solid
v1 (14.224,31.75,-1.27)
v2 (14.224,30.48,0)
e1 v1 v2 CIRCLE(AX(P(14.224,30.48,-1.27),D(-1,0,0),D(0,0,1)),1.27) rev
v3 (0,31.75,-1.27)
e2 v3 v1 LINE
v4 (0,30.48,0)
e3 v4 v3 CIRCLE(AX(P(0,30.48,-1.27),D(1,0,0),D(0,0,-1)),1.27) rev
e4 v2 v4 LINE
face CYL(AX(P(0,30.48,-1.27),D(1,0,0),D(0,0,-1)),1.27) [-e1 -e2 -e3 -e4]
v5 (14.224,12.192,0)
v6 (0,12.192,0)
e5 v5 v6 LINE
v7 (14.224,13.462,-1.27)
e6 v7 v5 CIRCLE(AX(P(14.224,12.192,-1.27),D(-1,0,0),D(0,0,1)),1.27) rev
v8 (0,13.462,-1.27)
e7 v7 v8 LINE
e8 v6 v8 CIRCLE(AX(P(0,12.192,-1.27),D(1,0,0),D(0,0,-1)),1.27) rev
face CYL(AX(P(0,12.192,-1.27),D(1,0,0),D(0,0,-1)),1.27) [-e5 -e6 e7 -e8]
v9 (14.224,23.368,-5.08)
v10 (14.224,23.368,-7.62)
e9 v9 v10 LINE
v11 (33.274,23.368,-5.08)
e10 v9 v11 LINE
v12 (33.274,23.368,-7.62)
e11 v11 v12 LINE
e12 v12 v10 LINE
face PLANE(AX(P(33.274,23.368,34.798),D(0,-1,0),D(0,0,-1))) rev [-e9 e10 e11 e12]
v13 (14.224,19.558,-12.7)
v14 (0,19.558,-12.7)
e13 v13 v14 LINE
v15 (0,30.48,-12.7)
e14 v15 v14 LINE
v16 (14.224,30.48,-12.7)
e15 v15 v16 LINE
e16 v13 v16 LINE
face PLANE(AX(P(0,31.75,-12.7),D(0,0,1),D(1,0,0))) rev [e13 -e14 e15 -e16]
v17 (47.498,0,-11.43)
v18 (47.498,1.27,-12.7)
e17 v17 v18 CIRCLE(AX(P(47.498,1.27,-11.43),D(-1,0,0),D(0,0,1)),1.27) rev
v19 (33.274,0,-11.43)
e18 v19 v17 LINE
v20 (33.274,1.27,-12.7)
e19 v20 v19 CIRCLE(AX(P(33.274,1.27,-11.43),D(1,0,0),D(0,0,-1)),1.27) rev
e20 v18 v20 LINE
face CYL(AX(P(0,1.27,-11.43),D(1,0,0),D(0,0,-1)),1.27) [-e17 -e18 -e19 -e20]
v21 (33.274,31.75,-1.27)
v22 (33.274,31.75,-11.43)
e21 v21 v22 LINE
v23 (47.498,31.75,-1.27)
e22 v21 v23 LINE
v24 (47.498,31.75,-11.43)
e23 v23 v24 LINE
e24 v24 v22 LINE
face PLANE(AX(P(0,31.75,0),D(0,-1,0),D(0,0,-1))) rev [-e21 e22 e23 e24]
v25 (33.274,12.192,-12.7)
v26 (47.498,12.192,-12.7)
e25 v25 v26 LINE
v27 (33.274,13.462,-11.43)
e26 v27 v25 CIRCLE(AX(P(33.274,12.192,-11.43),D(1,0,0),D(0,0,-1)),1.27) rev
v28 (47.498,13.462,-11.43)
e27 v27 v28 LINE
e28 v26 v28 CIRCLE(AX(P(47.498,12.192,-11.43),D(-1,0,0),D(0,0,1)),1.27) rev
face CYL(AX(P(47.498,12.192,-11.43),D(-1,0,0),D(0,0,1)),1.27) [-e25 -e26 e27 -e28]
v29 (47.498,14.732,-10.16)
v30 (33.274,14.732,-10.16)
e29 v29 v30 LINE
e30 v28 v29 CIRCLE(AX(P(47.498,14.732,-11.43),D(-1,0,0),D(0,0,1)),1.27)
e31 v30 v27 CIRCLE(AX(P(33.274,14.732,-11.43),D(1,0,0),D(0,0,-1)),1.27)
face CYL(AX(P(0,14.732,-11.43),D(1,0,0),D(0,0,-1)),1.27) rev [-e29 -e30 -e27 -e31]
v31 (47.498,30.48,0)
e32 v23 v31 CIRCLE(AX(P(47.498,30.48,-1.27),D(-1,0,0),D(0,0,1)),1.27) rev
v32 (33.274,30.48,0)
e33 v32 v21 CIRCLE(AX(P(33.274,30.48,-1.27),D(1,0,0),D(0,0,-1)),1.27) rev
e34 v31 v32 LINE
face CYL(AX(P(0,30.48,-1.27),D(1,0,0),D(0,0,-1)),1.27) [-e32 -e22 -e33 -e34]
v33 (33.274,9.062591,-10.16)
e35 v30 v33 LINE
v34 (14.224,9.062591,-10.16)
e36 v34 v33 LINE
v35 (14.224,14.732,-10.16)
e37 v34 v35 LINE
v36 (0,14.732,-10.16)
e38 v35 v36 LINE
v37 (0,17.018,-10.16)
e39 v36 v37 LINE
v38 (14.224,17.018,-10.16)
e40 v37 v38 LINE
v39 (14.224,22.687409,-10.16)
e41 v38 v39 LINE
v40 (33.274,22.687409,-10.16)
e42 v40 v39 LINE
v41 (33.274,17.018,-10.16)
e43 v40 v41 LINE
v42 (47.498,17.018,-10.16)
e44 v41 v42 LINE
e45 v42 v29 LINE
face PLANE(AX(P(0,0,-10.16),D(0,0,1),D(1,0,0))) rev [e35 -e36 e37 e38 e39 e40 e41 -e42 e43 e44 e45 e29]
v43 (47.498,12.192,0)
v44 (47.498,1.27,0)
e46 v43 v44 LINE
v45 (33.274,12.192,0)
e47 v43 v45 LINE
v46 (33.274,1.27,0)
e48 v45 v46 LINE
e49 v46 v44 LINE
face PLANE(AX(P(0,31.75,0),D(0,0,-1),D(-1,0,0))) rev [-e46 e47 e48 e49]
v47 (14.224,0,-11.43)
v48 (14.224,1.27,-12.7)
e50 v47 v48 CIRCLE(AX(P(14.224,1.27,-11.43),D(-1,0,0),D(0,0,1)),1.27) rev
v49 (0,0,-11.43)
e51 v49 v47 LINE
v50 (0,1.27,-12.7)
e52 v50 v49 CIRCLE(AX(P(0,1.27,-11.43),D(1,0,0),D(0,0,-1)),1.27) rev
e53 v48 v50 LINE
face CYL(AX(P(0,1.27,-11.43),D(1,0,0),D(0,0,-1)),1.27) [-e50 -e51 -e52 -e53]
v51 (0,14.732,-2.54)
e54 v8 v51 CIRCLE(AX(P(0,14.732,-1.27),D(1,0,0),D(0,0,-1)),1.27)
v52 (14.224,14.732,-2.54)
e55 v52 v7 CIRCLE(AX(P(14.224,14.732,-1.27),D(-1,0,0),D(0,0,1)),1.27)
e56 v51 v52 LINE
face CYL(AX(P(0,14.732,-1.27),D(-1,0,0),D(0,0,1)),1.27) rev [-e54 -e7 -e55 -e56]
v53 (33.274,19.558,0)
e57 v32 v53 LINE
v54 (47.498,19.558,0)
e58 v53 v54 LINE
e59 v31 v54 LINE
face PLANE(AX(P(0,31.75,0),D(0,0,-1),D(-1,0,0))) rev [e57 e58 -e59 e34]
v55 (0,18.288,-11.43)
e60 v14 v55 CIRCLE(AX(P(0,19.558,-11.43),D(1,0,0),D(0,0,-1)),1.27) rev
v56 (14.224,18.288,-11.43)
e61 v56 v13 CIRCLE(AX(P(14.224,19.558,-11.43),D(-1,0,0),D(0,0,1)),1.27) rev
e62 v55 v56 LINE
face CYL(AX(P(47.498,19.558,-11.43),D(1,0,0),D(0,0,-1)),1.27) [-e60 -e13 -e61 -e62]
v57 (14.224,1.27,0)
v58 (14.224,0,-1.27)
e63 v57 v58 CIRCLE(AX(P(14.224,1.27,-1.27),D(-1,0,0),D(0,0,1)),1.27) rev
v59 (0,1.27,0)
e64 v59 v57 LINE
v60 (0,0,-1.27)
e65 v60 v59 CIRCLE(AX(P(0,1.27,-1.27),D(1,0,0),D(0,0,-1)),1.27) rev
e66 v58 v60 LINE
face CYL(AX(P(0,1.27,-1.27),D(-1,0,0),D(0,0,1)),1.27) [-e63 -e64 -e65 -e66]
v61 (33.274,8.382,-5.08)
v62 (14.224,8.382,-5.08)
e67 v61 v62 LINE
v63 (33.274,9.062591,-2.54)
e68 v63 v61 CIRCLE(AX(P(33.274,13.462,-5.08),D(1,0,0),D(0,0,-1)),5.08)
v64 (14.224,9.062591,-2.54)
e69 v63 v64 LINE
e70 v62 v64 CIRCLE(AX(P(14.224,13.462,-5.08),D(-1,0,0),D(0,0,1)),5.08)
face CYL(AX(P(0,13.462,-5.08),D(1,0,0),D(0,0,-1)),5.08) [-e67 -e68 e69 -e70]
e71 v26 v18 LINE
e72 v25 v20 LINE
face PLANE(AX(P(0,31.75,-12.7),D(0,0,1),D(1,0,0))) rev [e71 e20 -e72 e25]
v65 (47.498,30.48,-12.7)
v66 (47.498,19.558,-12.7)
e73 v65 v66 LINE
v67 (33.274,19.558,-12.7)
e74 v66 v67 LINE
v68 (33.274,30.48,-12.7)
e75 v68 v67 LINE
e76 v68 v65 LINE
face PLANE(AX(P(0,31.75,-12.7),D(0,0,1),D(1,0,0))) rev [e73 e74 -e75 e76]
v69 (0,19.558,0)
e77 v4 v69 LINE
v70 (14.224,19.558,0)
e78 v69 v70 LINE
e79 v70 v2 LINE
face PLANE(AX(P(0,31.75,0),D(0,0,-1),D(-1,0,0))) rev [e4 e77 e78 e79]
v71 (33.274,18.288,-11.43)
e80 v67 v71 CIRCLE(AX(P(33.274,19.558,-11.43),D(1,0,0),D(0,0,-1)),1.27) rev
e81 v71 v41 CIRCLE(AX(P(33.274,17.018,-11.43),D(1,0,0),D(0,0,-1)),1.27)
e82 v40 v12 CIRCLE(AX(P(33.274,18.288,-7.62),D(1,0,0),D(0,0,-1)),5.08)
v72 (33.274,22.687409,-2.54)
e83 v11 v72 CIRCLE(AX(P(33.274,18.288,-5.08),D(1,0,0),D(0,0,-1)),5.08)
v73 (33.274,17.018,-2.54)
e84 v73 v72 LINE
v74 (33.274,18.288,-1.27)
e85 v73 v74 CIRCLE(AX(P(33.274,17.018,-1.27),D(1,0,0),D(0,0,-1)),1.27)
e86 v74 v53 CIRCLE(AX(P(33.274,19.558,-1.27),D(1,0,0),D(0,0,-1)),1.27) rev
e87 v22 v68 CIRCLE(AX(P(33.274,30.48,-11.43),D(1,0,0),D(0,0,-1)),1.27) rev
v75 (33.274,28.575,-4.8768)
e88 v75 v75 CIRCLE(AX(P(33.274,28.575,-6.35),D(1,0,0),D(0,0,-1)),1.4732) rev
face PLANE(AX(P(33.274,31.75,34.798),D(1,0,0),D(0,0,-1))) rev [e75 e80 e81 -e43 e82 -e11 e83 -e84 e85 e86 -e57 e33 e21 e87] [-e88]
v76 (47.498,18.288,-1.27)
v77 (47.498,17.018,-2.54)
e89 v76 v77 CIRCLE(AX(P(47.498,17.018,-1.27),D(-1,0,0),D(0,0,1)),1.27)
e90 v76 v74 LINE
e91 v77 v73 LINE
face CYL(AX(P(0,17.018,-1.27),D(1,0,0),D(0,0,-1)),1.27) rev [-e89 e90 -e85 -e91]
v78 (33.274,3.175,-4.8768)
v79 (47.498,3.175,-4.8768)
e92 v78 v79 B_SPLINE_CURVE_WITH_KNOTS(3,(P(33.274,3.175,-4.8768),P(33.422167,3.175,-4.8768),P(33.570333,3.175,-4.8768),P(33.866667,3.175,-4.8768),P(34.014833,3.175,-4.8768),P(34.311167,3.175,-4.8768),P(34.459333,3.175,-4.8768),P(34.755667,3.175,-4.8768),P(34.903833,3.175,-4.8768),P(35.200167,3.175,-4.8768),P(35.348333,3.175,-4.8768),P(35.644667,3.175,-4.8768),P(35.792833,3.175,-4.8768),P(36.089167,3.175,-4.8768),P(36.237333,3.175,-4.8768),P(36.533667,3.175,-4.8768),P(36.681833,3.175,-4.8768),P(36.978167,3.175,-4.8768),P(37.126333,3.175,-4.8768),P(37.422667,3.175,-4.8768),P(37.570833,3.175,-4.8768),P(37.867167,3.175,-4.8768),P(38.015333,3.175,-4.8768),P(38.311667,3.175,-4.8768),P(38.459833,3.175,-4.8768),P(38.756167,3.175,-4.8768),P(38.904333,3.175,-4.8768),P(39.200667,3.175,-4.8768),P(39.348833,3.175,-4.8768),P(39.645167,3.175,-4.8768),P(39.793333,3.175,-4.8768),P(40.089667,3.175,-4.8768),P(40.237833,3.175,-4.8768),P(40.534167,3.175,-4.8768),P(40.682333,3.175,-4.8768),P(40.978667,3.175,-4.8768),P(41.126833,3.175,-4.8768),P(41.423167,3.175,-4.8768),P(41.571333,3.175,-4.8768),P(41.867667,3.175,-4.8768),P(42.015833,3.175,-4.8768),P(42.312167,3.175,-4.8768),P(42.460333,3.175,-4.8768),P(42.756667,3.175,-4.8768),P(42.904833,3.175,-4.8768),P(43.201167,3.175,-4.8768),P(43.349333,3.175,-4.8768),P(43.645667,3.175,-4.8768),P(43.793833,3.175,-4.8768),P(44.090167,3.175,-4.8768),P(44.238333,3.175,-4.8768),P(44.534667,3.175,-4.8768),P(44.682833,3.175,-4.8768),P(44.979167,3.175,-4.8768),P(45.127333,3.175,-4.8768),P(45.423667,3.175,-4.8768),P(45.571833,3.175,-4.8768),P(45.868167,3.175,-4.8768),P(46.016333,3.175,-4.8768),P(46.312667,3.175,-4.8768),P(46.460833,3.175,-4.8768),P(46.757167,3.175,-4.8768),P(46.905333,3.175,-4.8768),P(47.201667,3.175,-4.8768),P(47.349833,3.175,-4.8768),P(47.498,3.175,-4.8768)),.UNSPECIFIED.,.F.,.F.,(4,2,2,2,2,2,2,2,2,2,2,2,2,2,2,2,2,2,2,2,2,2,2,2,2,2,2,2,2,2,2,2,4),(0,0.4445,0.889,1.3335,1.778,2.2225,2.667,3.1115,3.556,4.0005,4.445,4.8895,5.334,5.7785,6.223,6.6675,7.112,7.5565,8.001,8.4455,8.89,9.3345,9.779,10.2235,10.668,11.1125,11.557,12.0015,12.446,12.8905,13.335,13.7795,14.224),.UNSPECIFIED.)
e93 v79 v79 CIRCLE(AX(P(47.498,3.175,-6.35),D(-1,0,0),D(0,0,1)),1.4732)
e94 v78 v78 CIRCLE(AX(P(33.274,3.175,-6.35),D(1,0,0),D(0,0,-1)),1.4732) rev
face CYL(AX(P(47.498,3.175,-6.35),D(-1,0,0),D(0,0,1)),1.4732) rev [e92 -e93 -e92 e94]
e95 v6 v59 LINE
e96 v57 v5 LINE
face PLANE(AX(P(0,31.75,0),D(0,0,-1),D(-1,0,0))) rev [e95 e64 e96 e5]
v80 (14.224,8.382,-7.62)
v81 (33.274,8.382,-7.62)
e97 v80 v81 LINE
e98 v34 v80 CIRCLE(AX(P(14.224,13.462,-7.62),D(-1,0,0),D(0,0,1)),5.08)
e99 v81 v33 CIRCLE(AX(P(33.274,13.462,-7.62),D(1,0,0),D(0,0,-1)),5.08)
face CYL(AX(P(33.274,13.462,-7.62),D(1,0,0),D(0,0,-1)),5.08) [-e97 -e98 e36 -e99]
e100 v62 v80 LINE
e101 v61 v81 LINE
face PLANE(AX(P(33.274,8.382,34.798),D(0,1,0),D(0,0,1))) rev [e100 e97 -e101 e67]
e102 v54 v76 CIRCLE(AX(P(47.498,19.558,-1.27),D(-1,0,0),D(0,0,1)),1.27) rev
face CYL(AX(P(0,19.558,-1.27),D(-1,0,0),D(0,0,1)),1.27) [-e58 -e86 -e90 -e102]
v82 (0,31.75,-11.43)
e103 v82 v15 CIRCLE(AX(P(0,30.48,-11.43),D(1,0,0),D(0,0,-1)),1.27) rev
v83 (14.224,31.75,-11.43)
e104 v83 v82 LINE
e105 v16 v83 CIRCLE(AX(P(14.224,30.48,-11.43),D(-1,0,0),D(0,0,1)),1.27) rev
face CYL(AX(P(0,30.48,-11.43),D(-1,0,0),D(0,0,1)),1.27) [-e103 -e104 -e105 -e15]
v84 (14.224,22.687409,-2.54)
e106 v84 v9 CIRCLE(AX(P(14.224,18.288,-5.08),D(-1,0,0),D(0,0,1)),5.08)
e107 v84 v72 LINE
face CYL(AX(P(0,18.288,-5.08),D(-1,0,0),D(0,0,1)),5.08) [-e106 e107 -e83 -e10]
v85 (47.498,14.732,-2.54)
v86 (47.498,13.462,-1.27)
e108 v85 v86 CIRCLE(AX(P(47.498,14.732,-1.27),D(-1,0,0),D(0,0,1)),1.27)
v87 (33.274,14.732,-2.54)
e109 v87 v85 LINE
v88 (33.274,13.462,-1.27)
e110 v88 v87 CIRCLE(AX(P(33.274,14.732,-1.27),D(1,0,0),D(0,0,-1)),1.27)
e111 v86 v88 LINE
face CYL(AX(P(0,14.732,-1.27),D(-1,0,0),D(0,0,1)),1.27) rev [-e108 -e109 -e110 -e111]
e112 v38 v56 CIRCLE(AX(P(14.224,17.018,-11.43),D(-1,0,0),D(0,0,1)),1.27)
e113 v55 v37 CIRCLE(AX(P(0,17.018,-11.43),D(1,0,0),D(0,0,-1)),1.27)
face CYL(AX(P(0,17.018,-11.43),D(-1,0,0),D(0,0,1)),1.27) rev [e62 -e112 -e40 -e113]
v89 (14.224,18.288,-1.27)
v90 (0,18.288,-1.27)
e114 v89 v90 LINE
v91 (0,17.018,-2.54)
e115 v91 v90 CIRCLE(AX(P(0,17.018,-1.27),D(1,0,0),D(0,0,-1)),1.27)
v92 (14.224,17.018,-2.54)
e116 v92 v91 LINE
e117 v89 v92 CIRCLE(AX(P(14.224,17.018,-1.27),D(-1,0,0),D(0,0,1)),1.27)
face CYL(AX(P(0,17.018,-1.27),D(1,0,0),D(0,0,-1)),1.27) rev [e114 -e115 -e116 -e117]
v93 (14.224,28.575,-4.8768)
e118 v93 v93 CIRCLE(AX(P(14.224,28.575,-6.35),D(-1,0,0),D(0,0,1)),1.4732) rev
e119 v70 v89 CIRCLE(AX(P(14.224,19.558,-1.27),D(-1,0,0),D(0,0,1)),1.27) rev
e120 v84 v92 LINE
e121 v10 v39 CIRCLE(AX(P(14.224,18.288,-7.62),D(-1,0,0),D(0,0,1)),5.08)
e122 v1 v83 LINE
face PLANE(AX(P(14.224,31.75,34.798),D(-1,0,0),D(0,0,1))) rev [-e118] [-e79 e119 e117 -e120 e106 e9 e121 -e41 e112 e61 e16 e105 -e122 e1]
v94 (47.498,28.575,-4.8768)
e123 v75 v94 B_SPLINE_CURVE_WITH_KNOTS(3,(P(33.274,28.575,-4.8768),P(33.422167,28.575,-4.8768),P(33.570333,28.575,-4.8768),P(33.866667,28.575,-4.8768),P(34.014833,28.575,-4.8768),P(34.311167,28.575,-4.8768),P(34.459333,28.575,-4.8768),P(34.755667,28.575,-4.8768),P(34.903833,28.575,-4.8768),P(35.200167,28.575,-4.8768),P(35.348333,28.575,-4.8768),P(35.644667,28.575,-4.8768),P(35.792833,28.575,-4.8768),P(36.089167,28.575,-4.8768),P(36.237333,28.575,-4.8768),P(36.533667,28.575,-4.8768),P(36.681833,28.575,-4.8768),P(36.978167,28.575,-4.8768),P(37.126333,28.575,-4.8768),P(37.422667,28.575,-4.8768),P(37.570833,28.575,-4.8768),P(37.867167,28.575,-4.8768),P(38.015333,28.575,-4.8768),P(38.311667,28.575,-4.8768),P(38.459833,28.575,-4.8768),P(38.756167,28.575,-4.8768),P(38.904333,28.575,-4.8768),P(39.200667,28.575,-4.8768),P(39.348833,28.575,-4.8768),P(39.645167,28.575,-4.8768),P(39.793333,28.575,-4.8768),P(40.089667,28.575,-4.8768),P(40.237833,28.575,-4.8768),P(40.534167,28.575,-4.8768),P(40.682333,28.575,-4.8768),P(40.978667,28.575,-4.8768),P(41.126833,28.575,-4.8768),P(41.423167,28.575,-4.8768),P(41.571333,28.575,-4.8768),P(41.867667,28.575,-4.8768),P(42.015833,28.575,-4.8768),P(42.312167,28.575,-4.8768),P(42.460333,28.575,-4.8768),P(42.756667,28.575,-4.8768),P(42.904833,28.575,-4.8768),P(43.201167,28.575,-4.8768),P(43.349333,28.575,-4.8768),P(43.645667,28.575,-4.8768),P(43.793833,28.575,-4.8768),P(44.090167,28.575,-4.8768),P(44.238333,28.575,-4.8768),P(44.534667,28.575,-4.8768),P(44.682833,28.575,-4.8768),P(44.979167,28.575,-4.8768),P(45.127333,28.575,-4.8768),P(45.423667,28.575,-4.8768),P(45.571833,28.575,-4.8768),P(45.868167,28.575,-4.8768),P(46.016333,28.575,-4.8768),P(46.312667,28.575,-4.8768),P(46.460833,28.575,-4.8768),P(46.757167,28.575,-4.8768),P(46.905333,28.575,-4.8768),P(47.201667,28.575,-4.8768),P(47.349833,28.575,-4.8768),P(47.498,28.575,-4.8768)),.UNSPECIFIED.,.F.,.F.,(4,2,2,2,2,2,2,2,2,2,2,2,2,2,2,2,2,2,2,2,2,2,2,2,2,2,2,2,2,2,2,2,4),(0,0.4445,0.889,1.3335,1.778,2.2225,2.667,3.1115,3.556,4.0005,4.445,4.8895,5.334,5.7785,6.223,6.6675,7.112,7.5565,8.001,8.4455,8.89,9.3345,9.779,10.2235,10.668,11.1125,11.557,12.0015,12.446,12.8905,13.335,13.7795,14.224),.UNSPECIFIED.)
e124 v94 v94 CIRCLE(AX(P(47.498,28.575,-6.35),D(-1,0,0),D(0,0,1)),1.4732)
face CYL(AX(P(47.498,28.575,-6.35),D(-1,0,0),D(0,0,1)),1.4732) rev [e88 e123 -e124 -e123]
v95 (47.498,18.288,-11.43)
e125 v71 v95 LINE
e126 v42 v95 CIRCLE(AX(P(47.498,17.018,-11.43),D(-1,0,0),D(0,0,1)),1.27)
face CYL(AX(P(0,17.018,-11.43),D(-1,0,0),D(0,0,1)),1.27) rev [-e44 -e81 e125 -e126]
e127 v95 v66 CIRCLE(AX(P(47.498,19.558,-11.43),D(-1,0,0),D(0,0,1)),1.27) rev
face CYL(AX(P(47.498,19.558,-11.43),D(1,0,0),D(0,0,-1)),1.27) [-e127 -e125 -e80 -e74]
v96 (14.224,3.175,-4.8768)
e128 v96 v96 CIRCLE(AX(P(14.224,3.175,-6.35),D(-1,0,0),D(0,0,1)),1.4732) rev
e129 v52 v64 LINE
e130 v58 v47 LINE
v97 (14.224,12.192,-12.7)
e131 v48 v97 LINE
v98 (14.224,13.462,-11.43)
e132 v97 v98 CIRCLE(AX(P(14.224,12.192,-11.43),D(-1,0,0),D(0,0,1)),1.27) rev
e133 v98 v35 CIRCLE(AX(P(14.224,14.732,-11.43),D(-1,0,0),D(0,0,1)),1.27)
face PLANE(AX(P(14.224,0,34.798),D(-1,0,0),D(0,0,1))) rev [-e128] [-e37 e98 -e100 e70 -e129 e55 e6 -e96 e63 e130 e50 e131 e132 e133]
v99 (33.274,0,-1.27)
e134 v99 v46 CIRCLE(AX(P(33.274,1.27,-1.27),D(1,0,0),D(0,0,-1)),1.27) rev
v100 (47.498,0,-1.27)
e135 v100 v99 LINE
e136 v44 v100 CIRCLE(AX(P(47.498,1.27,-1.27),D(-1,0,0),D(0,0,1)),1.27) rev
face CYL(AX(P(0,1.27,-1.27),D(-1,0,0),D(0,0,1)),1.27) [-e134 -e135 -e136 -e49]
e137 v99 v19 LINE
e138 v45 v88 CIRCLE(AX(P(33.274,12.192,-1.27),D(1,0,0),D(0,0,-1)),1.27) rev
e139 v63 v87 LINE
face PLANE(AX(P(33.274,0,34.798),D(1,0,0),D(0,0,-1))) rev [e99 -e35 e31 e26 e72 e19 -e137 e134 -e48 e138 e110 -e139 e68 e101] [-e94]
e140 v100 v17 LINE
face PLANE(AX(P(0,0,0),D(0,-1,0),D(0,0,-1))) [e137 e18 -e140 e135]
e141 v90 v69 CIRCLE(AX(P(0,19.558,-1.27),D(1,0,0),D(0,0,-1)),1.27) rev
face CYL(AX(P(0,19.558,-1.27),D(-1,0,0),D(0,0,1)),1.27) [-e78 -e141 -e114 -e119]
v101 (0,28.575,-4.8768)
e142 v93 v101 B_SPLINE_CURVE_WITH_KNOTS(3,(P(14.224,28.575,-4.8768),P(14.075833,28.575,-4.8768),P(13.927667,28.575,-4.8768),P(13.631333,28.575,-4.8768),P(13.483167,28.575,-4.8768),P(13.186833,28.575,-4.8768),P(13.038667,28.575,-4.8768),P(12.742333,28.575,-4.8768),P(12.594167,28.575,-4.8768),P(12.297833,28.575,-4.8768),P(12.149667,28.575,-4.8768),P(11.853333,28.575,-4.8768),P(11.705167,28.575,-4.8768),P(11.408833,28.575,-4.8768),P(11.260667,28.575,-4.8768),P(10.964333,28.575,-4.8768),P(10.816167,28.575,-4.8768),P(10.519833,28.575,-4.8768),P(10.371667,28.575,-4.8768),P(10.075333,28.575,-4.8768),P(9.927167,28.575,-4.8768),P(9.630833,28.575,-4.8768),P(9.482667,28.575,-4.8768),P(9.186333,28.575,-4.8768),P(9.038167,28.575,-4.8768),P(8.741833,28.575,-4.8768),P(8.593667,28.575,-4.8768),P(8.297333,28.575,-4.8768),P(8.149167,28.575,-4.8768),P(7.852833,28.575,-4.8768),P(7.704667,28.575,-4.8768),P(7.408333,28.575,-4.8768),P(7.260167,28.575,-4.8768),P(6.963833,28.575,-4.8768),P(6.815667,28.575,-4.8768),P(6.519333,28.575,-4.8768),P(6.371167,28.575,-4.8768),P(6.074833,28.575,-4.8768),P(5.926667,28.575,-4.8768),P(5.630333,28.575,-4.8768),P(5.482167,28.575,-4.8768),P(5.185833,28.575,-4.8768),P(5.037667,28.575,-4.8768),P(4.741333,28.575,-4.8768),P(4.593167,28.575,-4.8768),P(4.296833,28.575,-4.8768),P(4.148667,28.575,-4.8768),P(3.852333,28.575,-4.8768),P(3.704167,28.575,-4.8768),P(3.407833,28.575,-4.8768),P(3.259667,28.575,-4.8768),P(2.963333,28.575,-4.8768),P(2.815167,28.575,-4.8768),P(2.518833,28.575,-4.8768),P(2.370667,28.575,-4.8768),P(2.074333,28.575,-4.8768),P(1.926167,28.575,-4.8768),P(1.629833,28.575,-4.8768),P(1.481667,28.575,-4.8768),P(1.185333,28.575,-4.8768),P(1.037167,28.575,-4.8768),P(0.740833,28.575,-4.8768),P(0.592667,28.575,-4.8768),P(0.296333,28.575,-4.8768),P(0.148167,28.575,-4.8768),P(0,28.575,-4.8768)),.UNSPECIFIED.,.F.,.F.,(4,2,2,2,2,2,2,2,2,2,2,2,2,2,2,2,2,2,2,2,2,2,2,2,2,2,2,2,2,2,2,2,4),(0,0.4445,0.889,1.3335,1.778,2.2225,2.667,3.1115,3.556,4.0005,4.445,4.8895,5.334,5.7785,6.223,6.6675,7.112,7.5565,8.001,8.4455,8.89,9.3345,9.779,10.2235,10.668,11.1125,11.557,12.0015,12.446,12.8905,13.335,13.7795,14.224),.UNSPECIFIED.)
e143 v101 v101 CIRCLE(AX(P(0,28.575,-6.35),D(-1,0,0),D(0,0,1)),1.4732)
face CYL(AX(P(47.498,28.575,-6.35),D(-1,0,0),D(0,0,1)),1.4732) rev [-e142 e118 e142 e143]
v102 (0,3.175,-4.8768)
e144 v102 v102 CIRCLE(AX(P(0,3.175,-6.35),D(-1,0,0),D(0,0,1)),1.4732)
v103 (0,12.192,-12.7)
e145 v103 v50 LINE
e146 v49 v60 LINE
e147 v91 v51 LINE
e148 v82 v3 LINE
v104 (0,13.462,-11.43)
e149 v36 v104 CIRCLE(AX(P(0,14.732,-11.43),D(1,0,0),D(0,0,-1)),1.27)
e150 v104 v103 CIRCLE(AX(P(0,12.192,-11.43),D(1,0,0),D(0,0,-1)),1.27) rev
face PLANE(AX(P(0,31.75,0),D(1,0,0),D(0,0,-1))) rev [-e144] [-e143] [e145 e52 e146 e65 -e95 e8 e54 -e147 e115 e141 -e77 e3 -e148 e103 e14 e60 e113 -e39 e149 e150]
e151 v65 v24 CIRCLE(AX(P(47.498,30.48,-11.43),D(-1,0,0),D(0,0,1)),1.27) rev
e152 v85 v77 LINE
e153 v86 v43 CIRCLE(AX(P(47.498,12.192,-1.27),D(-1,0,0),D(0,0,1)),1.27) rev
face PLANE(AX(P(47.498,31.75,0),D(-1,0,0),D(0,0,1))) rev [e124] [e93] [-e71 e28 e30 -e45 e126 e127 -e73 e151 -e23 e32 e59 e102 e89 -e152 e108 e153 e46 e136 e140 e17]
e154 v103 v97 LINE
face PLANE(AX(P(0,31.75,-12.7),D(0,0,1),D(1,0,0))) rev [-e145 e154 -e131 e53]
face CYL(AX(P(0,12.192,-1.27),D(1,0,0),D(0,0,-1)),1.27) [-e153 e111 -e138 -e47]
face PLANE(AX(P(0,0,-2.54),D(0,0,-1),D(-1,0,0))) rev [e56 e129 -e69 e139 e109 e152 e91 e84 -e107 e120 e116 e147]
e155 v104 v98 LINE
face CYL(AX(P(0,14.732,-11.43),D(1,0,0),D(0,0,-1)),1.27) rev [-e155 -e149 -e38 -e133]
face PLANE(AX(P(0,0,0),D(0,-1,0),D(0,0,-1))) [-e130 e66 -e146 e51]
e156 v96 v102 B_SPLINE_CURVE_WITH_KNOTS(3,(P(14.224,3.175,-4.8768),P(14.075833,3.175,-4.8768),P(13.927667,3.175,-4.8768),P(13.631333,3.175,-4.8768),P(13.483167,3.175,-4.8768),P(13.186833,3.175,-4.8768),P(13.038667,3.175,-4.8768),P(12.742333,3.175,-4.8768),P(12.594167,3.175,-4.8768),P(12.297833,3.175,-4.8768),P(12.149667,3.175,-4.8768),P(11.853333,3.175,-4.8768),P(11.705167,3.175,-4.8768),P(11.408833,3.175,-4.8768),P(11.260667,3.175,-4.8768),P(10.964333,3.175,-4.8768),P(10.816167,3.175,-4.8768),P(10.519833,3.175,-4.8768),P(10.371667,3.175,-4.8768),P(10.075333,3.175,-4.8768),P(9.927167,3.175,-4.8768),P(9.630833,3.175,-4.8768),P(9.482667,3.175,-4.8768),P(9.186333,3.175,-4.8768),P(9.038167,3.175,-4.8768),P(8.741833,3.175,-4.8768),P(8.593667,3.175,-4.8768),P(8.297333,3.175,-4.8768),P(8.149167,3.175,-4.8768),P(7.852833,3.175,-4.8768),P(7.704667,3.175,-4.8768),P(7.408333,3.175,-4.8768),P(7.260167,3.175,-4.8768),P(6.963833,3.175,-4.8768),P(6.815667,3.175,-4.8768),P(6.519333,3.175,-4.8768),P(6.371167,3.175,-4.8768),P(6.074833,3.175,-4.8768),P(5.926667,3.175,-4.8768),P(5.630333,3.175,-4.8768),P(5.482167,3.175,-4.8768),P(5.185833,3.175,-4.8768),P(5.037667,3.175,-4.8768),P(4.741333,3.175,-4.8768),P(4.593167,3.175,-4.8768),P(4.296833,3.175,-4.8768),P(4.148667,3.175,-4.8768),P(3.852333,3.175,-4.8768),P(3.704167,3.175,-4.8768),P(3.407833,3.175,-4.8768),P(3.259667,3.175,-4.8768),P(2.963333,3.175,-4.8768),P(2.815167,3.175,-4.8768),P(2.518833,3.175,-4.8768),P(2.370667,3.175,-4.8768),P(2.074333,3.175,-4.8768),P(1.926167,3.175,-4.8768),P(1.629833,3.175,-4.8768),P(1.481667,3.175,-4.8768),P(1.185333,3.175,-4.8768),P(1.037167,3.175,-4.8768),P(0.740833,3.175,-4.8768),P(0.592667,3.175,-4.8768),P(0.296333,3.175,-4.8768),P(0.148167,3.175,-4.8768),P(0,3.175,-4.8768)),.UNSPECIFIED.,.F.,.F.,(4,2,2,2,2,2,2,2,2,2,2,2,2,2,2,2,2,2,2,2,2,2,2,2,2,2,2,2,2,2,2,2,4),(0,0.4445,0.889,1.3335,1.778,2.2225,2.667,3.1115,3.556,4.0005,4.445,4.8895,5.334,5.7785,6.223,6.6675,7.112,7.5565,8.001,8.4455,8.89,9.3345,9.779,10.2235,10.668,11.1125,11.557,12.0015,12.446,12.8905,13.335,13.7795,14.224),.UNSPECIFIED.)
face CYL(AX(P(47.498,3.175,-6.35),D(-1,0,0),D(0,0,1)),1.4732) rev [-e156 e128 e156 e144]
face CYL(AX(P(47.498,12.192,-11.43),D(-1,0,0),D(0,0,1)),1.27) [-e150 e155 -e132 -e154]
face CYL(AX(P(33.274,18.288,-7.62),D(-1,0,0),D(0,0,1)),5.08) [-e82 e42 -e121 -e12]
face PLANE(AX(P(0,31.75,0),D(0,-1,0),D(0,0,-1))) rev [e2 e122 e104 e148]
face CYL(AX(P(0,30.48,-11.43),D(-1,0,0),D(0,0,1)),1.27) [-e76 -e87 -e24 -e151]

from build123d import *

# Parameters (mm, degrees)
SKETCH1_W           = 47.498
SKETCH1_H           = 12.7
BOSS_EXTRUDE1_DEPTH = 31.75
SKETCH2_R           = 1.4732
CUT_EXTRUDE1_DEPTH  = 47.498
SKETCH3_W           = 19.05
SKETCH3_H           = 8.382
CUT_EXTRUDE2_DEPTH  = 47.498
FILLET1_R           = 5.08
SKETCH4_W           = 47.498
SKETCH4_H           = 4.826
CUT_EXTRUDE3_DEPTH  = 2.54
SKETCH5_W           = 47.498
SKETCH5_H           = 4.826
CUT_EXTRUDE4_DEPTH  = 2.54
SKETCH6_W           = 19.05
SKETCH6_H           = 19.05
CUT_EXTRUDE5_DEPTH  = 2.54
SKETCH7_W           = 19.05
SKETCH7_H           = 17.006147254
CUT_EXTRUDE6_DEPTH  = 2.54
FILLET2_R           = 1.27


with BuildPart() as part:
    # Sketch1 → Boss-Extrude1 (new body)
    with BuildSketch(Plane(origin=(0, 0, 0), x_dir=(1, 0, 0), z_dir=(0, 1, 0))):
        with Locations((23.749, 6.35)):
            Rectangle(SKETCH1_W, SKETCH1_H)
    extrude(amount=BOSS_EXTRUDE1_DEPTH)

    # Sketch2 → Cut-Extrude1 (cut)
    with BuildSketch(Plane.ZY):
        with Locations((-6.35, 3.175)):
            Circle(SKETCH2_R)
        with Locations((-6.35, 28.575)):
            Circle(SKETCH2_R)
    extrude(amount=-CUT_EXTRUDE1_DEPTH, mode=Mode.SUBTRACT)

    # Sketch3 → Cut-Extrude2 (cut)
    with BuildSketch(Plane(origin=(0, 0, -12.7), x_dir=(-1, 0, 0), z_dir=(0, 0, -1))):
        with Locations((-23.749, 4.191)):
            Rectangle(SKETCH3_W, SKETCH3_H)
        with Locations((-23.749, 27.559)):
            Rectangle(SKETCH3_W, SKETCH3_H)
    extrude(amount=-CUT_EXTRUDE2_DEPTH, mode=Mode.SUBTRACT)

    # Fillet1
    fillet1_edges = [part.edges().sort_by_distance(p)[0] for p in [
        (23.749, 8.382, 0),
        (23.749, 8.382, -12.7),
        (23.749, 23.368, 0),
        (23.749, 23.368, -12.7),
    ]]
    fillet(fillet1_edges, radius=FILLET1_R)

    # Sketch4 → Cut-Extrude3 (cut)
    with BuildSketch(Plane.XY):
        with Locations((23.749, 15.875)):
            Rectangle(SKETCH4_W, SKETCH4_H)
    extrude(amount=-CUT_EXTRUDE3_DEPTH, mode=Mode.SUBTRACT)

    # Sketch5 → Cut-Extrude4 (cut)
    with BuildSketch(Plane(origin=(0, 0, -12.7), x_dir=(-1, 0, 0), z_dir=(0, 0, -1))):
        with Locations((-23.749, 15.875)):
            Rectangle(SKETCH5_W, SKETCH5_H)
    extrude(amount=-CUT_EXTRUDE4_DEPTH, mode=Mode.SUBTRACT)

    # Sketch6 → Cut-Extrude5 (cut)
    with BuildSketch(Plane.XY):
        with Locations((23.749, 17.907)):
            Rectangle(SKETCH6_W, SKETCH6_H)
    extrude(amount=-CUT_EXTRUDE5_DEPTH, mode=Mode.SUBTRACT)

    # Sketch7 → Cut-Extrude6 (cut)
    with BuildSketch(Plane(origin=(0, 0, -12.7), x_dir=(-1, 0, 0), z_dir=(0, 0, -1))):
        with Locations((-23.749, 16.885073627)):
            Rectangle(SKETCH7_W, SKETCH7_H)
    extrude(amount=-CUT_EXTRUDE6_DEPTH, mode=Mode.SUBTRACT)

    # Fillet2
    fillet2_edges = [part.edges().sort_by_distance(p)[0] for p in [
        (40.386, 13.462, 0),
        (40.386, 13.462, -2.54),
        (40.386, 18.288, -2.54),
        (40.386, 18.288, 0),
        (7.112, 13.462, 0),
        (7.112, 13.462, -2.54),
        (7.112, 18.288, -2.54),
        (7.112, 18.288, 0),
        (7.112, 31.75, 0),
        (40.386, 31.75, 0),
        (7.112, 0, 0),
        (40.386, 0, 0),
        (40.386, 0, -12.7),
        (40.386, 31.75, -12.7),
        (40.386, 13.462, -12.7),
        (40.386, 13.462, -10.16),
        (40.386, 18.288, -10.16),
        (40.386, 18.288, -12.7),
        (7.112, 31.75, -12.7),
        (7.112, 18.288, -12.7),
        (7.112, 18.288, -10.16),
        (7.112, 0, -12.7),
        (7.112, 13.462, -12.7),
        (7.112, 13.462, -10.16),
    ]]
    fillet(fillet2_edges, radius=FILLET2_R - 0.0001)  # a hair under: the kernel refuses the full size


solid = part.part
